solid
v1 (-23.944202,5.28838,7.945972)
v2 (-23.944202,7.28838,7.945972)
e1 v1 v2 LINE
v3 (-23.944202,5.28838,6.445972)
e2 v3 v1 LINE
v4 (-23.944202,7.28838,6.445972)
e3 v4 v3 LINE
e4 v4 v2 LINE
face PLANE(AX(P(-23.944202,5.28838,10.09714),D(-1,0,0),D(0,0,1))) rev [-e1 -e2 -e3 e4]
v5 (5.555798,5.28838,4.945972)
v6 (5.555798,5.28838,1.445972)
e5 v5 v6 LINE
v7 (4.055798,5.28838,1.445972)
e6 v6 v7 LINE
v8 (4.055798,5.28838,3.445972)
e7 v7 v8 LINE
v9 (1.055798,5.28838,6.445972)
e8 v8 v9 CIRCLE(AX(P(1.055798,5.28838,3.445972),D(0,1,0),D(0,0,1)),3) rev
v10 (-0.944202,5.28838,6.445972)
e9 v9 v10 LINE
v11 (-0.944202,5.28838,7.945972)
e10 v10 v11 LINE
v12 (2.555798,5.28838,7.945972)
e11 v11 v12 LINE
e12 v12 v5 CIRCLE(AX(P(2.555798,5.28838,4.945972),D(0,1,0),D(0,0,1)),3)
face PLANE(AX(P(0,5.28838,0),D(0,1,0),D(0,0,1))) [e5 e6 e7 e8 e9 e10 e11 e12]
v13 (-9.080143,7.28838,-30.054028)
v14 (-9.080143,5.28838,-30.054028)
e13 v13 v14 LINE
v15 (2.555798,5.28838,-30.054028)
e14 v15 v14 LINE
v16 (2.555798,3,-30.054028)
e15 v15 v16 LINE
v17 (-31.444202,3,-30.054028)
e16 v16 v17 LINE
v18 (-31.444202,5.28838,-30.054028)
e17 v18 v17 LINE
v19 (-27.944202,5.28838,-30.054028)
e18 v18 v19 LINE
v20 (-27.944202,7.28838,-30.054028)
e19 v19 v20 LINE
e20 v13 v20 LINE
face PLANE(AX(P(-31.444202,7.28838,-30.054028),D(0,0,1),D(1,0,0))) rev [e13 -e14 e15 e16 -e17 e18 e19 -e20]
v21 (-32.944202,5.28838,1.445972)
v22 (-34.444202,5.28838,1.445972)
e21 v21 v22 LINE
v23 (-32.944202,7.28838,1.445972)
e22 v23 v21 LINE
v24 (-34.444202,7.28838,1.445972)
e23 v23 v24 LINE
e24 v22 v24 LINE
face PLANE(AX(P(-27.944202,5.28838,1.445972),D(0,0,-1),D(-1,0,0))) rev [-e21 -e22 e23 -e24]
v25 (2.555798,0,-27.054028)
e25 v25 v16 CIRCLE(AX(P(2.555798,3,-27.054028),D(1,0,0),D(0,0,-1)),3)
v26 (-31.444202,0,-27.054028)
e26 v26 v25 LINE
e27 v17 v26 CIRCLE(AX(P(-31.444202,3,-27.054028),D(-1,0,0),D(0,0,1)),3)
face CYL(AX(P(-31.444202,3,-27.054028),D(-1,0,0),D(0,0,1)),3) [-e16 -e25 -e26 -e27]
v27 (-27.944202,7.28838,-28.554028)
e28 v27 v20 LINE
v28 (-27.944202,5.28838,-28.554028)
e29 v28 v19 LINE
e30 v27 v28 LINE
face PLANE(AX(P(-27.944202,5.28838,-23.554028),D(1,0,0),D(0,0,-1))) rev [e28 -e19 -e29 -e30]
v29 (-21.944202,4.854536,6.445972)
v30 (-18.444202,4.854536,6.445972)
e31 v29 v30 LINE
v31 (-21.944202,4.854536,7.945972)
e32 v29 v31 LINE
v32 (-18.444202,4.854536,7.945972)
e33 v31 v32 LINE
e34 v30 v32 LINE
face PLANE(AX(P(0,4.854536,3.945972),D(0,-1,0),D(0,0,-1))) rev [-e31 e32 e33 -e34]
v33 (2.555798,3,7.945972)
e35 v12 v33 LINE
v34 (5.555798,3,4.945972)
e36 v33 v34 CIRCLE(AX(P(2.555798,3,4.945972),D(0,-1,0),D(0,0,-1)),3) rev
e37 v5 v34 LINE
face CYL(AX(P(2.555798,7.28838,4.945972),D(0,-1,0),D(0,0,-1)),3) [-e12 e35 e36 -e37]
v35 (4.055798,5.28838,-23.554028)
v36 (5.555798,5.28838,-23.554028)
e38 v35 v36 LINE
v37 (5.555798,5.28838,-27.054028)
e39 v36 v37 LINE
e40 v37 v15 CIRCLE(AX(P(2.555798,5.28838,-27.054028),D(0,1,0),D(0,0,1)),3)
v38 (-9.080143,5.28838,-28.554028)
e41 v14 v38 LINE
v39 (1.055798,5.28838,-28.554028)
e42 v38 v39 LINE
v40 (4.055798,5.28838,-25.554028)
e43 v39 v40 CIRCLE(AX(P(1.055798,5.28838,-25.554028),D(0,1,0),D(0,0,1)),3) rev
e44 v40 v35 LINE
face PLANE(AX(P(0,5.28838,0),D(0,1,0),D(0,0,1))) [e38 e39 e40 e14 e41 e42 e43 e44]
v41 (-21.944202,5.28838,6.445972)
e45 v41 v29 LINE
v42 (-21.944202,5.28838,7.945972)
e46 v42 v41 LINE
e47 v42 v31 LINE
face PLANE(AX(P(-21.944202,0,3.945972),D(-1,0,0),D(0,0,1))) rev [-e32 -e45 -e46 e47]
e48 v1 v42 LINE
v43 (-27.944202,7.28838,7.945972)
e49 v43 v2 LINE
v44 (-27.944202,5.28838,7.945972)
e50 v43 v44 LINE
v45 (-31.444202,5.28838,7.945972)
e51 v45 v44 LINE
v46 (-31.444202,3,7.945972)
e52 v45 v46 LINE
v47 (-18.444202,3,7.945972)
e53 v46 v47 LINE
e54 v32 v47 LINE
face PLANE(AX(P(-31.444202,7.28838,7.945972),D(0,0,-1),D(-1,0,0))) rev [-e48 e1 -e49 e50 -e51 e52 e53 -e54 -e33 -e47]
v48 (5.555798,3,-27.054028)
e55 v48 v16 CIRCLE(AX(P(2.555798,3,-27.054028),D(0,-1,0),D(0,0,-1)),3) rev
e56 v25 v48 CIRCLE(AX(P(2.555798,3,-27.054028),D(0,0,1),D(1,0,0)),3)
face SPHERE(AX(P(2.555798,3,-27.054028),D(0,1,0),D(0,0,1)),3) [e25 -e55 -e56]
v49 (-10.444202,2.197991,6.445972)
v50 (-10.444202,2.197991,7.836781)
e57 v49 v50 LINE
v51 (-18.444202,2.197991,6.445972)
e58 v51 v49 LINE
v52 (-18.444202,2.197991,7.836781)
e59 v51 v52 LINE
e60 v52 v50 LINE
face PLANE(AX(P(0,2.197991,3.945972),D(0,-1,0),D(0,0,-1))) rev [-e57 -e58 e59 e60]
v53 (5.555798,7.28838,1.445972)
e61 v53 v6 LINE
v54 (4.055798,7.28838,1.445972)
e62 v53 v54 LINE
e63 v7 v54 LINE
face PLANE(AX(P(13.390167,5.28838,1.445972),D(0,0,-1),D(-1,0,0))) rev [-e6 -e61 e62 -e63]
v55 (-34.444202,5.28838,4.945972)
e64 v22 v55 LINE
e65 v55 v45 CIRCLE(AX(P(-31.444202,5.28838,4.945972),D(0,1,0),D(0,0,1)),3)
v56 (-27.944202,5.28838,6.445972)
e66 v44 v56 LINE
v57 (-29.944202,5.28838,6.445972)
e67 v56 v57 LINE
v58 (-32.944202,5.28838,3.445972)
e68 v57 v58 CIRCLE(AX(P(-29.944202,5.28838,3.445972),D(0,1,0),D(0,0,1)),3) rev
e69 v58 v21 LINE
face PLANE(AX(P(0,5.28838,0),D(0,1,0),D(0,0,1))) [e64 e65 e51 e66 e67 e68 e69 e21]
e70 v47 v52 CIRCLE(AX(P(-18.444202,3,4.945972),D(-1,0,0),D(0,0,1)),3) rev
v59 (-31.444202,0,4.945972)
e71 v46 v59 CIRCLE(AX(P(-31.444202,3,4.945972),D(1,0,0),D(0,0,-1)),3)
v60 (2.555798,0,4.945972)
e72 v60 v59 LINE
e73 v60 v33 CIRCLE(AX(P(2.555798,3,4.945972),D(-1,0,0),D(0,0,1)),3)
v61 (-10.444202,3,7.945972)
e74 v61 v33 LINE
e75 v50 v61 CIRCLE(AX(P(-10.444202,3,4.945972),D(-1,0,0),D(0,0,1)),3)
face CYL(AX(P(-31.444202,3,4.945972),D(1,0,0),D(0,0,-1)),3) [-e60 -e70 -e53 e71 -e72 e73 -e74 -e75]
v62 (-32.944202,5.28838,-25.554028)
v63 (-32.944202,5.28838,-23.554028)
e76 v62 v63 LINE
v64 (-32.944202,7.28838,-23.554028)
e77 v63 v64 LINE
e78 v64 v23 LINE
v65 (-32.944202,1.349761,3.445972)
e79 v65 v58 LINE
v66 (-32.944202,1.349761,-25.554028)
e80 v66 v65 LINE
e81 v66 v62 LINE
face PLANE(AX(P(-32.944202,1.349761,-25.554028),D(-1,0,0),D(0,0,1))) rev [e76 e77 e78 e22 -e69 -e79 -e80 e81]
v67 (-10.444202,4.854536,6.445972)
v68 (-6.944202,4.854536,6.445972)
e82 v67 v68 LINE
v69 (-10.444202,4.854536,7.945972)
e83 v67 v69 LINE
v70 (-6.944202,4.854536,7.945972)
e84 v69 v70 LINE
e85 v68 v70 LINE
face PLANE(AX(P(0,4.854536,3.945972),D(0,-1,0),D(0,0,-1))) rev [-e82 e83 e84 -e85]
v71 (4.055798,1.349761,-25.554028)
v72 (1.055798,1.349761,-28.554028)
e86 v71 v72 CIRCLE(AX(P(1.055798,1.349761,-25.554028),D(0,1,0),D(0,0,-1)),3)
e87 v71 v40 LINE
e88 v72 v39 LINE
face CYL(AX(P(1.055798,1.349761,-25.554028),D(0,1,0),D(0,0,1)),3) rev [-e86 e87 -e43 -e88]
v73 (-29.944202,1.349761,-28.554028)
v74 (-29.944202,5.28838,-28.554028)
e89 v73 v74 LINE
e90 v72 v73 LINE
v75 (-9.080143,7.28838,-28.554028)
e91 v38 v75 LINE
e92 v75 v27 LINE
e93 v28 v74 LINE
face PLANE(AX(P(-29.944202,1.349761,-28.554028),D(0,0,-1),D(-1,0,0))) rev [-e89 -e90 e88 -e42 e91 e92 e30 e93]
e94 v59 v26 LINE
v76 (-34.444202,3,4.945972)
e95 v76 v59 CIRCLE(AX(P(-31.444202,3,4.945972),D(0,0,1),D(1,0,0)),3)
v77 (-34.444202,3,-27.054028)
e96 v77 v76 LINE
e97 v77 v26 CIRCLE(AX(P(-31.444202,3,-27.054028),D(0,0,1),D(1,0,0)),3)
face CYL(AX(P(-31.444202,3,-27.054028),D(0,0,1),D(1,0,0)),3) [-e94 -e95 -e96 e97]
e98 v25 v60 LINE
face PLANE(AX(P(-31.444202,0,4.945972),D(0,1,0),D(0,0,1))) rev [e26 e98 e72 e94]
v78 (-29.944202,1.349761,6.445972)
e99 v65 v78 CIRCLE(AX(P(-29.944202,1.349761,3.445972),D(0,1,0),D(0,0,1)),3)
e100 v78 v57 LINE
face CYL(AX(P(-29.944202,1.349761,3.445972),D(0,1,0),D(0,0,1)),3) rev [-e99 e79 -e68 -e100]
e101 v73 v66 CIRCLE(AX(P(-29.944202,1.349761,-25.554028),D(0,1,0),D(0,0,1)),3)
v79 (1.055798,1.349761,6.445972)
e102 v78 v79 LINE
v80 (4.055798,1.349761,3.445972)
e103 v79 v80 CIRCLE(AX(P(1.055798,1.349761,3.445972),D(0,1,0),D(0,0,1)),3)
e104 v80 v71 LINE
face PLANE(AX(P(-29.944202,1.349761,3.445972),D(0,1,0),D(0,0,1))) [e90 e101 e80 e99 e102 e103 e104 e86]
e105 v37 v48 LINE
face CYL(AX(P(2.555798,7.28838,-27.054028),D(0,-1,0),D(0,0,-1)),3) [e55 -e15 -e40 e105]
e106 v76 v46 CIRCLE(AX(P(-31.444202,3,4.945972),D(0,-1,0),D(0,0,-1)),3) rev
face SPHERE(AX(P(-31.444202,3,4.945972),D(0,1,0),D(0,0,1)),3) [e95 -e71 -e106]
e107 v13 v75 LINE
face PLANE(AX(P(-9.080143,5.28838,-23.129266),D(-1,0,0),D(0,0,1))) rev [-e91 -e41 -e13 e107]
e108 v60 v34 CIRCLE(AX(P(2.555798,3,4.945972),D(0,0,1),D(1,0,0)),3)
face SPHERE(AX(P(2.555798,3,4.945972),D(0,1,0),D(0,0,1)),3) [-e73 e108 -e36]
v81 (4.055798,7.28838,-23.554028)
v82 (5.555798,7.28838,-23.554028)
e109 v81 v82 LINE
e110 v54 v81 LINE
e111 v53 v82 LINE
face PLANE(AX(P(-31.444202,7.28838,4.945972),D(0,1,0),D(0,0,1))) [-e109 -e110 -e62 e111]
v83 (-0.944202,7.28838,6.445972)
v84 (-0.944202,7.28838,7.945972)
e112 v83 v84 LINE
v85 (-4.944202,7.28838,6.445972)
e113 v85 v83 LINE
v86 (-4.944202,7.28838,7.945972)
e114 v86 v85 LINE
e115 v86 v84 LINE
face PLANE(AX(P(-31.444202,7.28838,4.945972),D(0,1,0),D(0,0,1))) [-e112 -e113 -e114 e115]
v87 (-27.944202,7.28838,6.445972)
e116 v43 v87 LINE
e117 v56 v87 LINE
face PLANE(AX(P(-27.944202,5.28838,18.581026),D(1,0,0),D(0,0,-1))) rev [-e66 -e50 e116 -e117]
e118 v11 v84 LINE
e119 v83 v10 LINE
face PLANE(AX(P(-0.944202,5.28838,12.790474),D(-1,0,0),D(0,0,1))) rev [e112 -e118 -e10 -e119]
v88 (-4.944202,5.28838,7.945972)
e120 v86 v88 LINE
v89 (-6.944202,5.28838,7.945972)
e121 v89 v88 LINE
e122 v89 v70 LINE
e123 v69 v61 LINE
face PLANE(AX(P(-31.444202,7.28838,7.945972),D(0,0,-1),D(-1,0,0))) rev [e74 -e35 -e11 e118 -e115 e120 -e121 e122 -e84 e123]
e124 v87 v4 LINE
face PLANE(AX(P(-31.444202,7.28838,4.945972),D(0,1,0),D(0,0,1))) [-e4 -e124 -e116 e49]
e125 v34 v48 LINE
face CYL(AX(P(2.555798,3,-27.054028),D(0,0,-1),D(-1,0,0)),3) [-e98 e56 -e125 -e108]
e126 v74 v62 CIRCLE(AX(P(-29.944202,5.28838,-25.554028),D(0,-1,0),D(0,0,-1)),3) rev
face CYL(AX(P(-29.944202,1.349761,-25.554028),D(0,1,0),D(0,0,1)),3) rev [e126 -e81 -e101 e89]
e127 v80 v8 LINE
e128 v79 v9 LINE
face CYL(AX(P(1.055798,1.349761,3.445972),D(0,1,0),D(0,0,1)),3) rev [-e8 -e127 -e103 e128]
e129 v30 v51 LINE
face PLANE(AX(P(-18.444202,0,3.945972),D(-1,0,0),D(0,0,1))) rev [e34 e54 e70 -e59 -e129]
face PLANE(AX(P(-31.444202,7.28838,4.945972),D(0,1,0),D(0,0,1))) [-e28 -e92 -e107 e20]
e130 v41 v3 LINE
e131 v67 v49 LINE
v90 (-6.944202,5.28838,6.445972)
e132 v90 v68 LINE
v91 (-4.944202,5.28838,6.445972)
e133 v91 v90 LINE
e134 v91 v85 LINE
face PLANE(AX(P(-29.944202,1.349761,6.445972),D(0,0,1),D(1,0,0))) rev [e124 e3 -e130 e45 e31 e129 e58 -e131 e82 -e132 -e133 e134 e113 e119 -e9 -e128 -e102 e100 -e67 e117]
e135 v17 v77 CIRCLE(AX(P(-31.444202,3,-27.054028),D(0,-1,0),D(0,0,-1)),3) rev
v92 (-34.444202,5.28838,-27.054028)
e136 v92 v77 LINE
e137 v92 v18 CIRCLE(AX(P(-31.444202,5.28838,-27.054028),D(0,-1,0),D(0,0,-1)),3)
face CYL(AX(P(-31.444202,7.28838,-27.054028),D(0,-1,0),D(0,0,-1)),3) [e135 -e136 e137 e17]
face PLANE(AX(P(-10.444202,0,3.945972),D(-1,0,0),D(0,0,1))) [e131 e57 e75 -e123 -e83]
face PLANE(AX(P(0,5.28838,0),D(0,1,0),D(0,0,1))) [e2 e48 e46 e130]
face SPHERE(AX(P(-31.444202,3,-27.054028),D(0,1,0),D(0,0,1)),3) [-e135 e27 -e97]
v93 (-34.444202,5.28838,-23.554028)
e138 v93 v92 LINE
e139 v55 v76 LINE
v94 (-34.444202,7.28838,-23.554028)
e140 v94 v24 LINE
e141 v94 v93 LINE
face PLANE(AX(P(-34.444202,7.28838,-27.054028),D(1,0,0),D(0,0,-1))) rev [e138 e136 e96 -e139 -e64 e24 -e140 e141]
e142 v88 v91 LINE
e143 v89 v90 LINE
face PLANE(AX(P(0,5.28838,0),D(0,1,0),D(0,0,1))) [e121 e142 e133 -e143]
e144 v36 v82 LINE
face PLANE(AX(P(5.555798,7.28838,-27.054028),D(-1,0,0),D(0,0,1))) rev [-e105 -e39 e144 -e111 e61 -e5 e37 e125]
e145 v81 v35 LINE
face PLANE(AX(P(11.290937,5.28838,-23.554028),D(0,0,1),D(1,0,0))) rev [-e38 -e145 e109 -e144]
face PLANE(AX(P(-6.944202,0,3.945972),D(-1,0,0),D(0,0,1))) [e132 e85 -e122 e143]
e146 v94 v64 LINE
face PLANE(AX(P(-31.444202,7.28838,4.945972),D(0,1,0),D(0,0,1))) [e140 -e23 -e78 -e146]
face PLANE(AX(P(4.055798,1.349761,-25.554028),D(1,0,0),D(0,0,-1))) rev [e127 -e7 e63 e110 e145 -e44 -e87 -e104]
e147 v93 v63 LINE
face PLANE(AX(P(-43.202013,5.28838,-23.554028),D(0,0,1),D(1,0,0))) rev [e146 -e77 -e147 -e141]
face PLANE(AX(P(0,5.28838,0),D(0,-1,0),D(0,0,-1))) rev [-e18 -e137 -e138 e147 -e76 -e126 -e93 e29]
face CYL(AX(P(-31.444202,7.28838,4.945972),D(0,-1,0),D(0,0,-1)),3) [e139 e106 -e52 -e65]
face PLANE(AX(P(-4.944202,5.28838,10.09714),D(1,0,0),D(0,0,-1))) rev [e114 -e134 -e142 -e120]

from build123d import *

# Parameters (mm, degrees)
BOSS_EXTRUDE1_DEPTH = 7.288380162
CUT_EXTRUDE3_DEPTH  = 5.938619602
SKETCH5_W           = 8
SKETCH5_H           = 2.8
SKETCH5_W_2         = 15
SKETCH5_H_2         = 1.082982858
CUT_EXTRUDE6_DEPTH  = 4
FILLET2_R           = 3
SKETCH7_W           = 19
SKETCH7_H           = 6.03347221
CUT_EXTRUDE8_DEPTH  = 2
SKETCH8_W           = 14.334368534
SKETCH8_H           = 11.344502268
SKETCH8_W_2         = 12.278418615
SKETCH8_H_2         = 17.135054821
SKETCH8_W_3         = 15.257811301
SKETCH8_H_3         = 9.410205862
SKETCH8_W_4         = 12.235138376
SKETCH8_H_4         = 13.74281341
CUT_EXTRUDE9_DEPTH  = 2
SKETCH9_W           = 12
SKETCH9_H           = 10.54511274
CUT_EXTRUDE10_DEPTH = 2


with BuildPart() as part:
    # Sketch1 → Boss-Extrude1 (new body)
    with BuildSketch(Plane(origin=(0, 0, 0), x_dir=(1, 0, 0), z_dir=(0, 1, 0))):
        with BuildLine():
            Line((-31.444201696, 30.054028384), (2.555798304, 30.054028384))
            ThreePointArc((2.555798304, 30.054028384), (4.677118648, 29.175348727), (5.555798304, 27.054028384))
            Line((5.555798304, 27.054028384), (5.555798304, -4.945971616))
            ThreePointArc((5.555798304, -4.945971616), (4.677118648, -7.06729196), (2.555798304, -7.945971616))
            Line((2.555798304, -7.945971616), (-31.444201696, -7.945971616))
            ThreePointArc((-31.444201696, -7.945971616), (-33.565522039, -7.06729196), (-34.444201696, -4.945971616))
            Line((-34.444201696, -4.945971616), (-34.444201696, 27.054028384))
            ThreePointArc((-34.444201696, 27.054028384), (-33.565522039, 29.175348727), (-31.444201696, 30.054028384))
        make_face()
    extrude(amount=BOSS_EXTRUDE1_DEPTH)

    # Sketch2 → Cut-Extrude3 (cut)
    with BuildSketch(Plane(origin=(0, 7.288380162, 0), x_dir=(1, 0, 0), z_dir=(0, 1, 0))):
        with BuildLine():
            Line((-29.944201696, 28.554028384), (1.055798304, 28.554028384))
            ThreePointArc((1.055798304, 28.554028384), (3.177118648, 27.675348727), (4.055798304, 25.554028384))
            Line((4.055798304, 25.554028384), (4.055798304, -3.445971616))
            ThreePointArc((4.055798304, -3.445971616), (3.177118648, -5.56729196), (1.055798304, -6.445971616))
            Line((1.055798304, -6.445971616), (-29.944201696, -6.445971616))
            ThreePointArc((-29.944201696, -6.445971616), (-32.065522039, -5.56729196), (-32.944201696, -3.445971616))
            Line((-32.944201696, -3.445971616), (-32.944201696, 25.554028384))
            ThreePointArc((-32.944201696, 25.554028384), (-32.065522039, 27.675348727), (-29.944201696, 28.554028384))
        make_face()
    extrude(amount=-CUT_EXTRUDE3_DEPTH, mode=Mode.SUBTRACT)

    # Sketch5 → Cut-Extrude6 (cut)
    with BuildSketch(Plane.XY.offset(7.945971616)):
        with Locations((-14.444201696, 3.597990821)):
            Rectangle(SKETCH5_W, SKETCH5_H)
        with Locations((-14.444201696, 5.396027171)):
            Rectangle(SKETCH5_W_2, SKETCH5_H_2)
    extrude(amount=-CUT_EXTRUDE6_DEPTH, mode=Mode.SUBTRACT)

    # Fillet2
    # the kernel refuses this fillet: 3 mm, written as the material it takes off along each edge
    with BuildSketch(Plane(origin=(2.555798304, 0, 7.945971616), x_dir=(0, 0, -1), z_dir=(-1, 0, 0))) as fillet2_piece_1:
        with BuildLine():
            CenterArc((FILLET2_R, -FILLET2_R), FILLET2_R, 90, 90)
            Line((0, -FILLET2_R), (-FILLET2_R * 0.02, -FILLET2_R))
            Line((-FILLET2_R * 0.02, -FILLET2_R), (-FILLET2_R * 0.02, FILLET2_R * 0.02))
            Line((-FILLET2_R * 0.02, FILLET2_R * 0.02), (FILLET2_R, FILLET2_R * 0.02))
            Line((FILLET2_R, FILLET2_R * 0.02), (FILLET2_R, 0))
        make_face()
    extrude(amount=34, mode=Mode.SUBTRACT)
    with BuildSketch(Plane(origin=(2.555798304, 0, 4.945971616), x_dir=(1, 0, 0), z_dir=(0, 0, -1))) as fillet2_piece_2:
        with BuildLine():
            CenterArc((3 - FILLET2_R, -FILLET2_R), FILLET2_R, 0, 90)
            Line((3, -FILLET2_R), (3 + FILLET2_R * 0.02, -FILLET2_R))
            Line((3 + FILLET2_R * 0.02, -FILLET2_R), (3 + FILLET2_R * 0.02, 0))
            Line((3 + FILLET2_R * 0.02, 0), (3, FILLET2_R * 0.02))
            Line((3, FILLET2_R * 0.02), (3 - FILLET2_R, FILLET2_R * 0.02))
            Line((3 - FILLET2_R, FILLET2_R * 0.02), (3 - FILLET2_R, 0))
        make_face()
    revolve(axis=Axis((2.555798304, 0, 4.945971616), (0, -1, 0)), revolution_arc=90, mode=Mode.SUBTRACT)
    with BuildSketch(Plane(origin=(5.555798304, 0, -27.054028384), x_dir=(-1, 0, 0), z_dir=(0, 0, 1)), Plane(origin=(-34.444201696, 0, 4.945971616), x_dir=(1, 0, 0), z_dir=(0, 0, -1))) as fillet2_piece_3:
        with BuildLine():
            CenterArc((FILLET2_R, -FILLET2_R), FILLET2_R, 90, 90)
            Line((0, -FILLET2_R), (-FILLET2_R * 0.02, -FILLET2_R))
            Line((-FILLET2_R * 0.02, -FILLET2_R), (-FILLET2_R * 0.02, FILLET2_R * 0.02))
            Line((-FILLET2_R * 0.02, FILLET2_R * 0.02), (FILLET2_R, FILLET2_R * 0.02))
            Line((FILLET2_R, FILLET2_R * 0.02), (FILLET2_R, 0))
        make_face()
    extrude(amount=32, mode=Mode.SUBTRACT)
    with BuildSketch(Plane(origin=(2.555798304, 0, -27.054028384), x_dir=(0, 0, -1), z_dir=(-1, 0, 0))) as fillet2_piece_4:
        with BuildLine():
            CenterArc((3 - FILLET2_R, -FILLET2_R), FILLET2_R, 0, 90)
            Line((3 - FILLET2_R, 0), (3 - FILLET2_R, FILLET2_R * 0.02))
            Line((3 - FILLET2_R, FILLET2_R * 0.02), (3, FILLET2_R * 0.02))
            Line((3, FILLET2_R * 0.02), (3 + FILLET2_R * 0.02, 0))
            Line((3 + FILLET2_R * 0.02, 0), (3 + FILLET2_R * 0.02, -FILLET2_R))
            Line((3 + FILLET2_R * 0.02, -FILLET2_R), (3, -FILLET2_R))
        make_face()
    revolve(axis=Axis((2.555798304, 0, -27.054028384), (0, -1, 0)), revolution_arc=90, mode=Mode.SUBTRACT)
    with BuildSketch(Plane(origin=(-31.444201696, 0, -30.054028384), x_dir=(0, 1, 0), z_dir=(1, 0, 0))) as fillet2_piece_5:
        with BuildLine():
            CenterArc((FILLET2_R, FILLET2_R), FILLET2_R, 180, 90)
            Line((0, FILLET2_R), (-FILLET2_R * 0.02, FILLET2_R))
            Line((-FILLET2_R * 0.02, FILLET2_R), (-FILLET2_R * 0.02, -FILLET2_R * 0.02))
            Line((-FILLET2_R * 0.02, -FILLET2_R * 0.02), (FILLET2_R, -FILLET2_R * 0.02))
            Line((FILLET2_R, -FILLET2_R * 0.02), (FILLET2_R, 0))
        make_face()
    extrude(amount=34, mode=Mode.SUBTRACT)
    with BuildSketch(Plane(origin=(-31.444201696, 0, -27.054028384), x_dir=(-1, 0, 0), z_dir=(0, 0, 1))) as fillet2_piece_6:
        with BuildLine():
            CenterArc((3 - FILLET2_R, -FILLET2_R), FILLET2_R, 0, 90)
            Line((3 - FILLET2_R, 0), (3 - FILLET2_R, FILLET2_R * 0.02))
            Line((3 - FILLET2_R, FILLET2_R * 0.02), (3, FILLET2_R * 0.02))
            Line((3, FILLET2_R * 0.02), (3 + FILLET2_R * 0.02, 0))
            Line((3 + FILLET2_R * 0.02, 0), (3 + FILLET2_R * 0.02, -FILLET2_R))
            Line((3 + FILLET2_R * 0.02, -FILLET2_R), (3, -FILLET2_R))
        make_face()
    revolve(axis=Axis((-31.444201696, 0, -27.054028384), (0, -1, 0)), revolution_arc=90, mode=Mode.SUBTRACT)
    with BuildSketch(Plane(origin=(-31.444201696, 0, 4.945971616), x_dir=(0, 0, 1), z_dir=(1, 0, 0))) as fillet2_piece_7:
        with BuildLine():
            CenterArc((3 - FILLET2_R, -FILLET2_R), FILLET2_R, 0, 90)
            Line((3, -FILLET2_R), (3 + FILLET2_R * 0.02, -FILLET2_R))
            Line((3 + FILLET2_R * 0.02, -FILLET2_R), (3 + FILLET2_R * 0.02, 0))
            Line((3 + FILLET2_R * 0.02, 0), (3, FILLET2_R * 0.02))
            Line((3, FILLET2_R * 0.02), (3 - FILLET2_R, FILLET2_R * 0.02))
            Line((3 - FILLET2_R, FILLET2_R * 0.02), (3 - FILLET2_R, 0))
        make_face()
    revolve(axis=Axis((-31.444201696, 0, 4.945971616), (0, -1, 0)), revolution_arc=90, mode=Mode.SUBTRACT)

    # Sketch7 → Cut-Extrude8 (cut)
    with BuildSketch(Plane(origin=(0, 7.288380162, 0), x_dir=(1, 0, 0), z_dir=(0, 1, 0))):
        with Locations((-14.444201696, -7.080404366)):
            Rectangle(SKETCH7_W, SKETCH7_H)
    extrude(amount=-CUT_EXTRUDE8_DEPTH, mode=Mode.SUBTRACT)

    # Sketch8 → Cut-Extrude9 (cut)
    with BuildSketch(Plane(origin=(0, 7.288380162, 0), x_dir=(1, 0, 0), z_dir=(0, 1, 0))):
        with Locations((6.222982571, -7.11822275)):
            Rectangle(SKETCH8_W, SKETCH8_H)
        with Locations((-34.083411004, -10.013499027)):
            Rectangle(SKETCH8_W_2, SKETCH8_H_2)
        with Locations((-35.573107347, 28.259131315)):
            Rectangle(SKETCH8_W_3, SKETCH8_H_3)
        with Locations((5.173367492, 30.425435089)):
            Rectangle(SKETCH8_W_4, SKETCH8_H_4)
    extrude(amount=-CUT_EXTRUDE9_DEPTH, mode=Mode.SUBTRACT)

    # Sketch9 → Cut-Extrude10 (cut)
    with BuildSketch(Plane(origin=(0, 7.288380162, 0), x_dir=(1, 0, 0), z_dir=(0, 1, 0))):
        with Locations((-3.080143155, 28.401822491)):
            Rectangle(SKETCH9_W, SKETCH9_H)
    extrude(amount=-CUT_EXTRUDE10_DEPTH, mode=Mode.SUBTRACT)


solid = part.part
